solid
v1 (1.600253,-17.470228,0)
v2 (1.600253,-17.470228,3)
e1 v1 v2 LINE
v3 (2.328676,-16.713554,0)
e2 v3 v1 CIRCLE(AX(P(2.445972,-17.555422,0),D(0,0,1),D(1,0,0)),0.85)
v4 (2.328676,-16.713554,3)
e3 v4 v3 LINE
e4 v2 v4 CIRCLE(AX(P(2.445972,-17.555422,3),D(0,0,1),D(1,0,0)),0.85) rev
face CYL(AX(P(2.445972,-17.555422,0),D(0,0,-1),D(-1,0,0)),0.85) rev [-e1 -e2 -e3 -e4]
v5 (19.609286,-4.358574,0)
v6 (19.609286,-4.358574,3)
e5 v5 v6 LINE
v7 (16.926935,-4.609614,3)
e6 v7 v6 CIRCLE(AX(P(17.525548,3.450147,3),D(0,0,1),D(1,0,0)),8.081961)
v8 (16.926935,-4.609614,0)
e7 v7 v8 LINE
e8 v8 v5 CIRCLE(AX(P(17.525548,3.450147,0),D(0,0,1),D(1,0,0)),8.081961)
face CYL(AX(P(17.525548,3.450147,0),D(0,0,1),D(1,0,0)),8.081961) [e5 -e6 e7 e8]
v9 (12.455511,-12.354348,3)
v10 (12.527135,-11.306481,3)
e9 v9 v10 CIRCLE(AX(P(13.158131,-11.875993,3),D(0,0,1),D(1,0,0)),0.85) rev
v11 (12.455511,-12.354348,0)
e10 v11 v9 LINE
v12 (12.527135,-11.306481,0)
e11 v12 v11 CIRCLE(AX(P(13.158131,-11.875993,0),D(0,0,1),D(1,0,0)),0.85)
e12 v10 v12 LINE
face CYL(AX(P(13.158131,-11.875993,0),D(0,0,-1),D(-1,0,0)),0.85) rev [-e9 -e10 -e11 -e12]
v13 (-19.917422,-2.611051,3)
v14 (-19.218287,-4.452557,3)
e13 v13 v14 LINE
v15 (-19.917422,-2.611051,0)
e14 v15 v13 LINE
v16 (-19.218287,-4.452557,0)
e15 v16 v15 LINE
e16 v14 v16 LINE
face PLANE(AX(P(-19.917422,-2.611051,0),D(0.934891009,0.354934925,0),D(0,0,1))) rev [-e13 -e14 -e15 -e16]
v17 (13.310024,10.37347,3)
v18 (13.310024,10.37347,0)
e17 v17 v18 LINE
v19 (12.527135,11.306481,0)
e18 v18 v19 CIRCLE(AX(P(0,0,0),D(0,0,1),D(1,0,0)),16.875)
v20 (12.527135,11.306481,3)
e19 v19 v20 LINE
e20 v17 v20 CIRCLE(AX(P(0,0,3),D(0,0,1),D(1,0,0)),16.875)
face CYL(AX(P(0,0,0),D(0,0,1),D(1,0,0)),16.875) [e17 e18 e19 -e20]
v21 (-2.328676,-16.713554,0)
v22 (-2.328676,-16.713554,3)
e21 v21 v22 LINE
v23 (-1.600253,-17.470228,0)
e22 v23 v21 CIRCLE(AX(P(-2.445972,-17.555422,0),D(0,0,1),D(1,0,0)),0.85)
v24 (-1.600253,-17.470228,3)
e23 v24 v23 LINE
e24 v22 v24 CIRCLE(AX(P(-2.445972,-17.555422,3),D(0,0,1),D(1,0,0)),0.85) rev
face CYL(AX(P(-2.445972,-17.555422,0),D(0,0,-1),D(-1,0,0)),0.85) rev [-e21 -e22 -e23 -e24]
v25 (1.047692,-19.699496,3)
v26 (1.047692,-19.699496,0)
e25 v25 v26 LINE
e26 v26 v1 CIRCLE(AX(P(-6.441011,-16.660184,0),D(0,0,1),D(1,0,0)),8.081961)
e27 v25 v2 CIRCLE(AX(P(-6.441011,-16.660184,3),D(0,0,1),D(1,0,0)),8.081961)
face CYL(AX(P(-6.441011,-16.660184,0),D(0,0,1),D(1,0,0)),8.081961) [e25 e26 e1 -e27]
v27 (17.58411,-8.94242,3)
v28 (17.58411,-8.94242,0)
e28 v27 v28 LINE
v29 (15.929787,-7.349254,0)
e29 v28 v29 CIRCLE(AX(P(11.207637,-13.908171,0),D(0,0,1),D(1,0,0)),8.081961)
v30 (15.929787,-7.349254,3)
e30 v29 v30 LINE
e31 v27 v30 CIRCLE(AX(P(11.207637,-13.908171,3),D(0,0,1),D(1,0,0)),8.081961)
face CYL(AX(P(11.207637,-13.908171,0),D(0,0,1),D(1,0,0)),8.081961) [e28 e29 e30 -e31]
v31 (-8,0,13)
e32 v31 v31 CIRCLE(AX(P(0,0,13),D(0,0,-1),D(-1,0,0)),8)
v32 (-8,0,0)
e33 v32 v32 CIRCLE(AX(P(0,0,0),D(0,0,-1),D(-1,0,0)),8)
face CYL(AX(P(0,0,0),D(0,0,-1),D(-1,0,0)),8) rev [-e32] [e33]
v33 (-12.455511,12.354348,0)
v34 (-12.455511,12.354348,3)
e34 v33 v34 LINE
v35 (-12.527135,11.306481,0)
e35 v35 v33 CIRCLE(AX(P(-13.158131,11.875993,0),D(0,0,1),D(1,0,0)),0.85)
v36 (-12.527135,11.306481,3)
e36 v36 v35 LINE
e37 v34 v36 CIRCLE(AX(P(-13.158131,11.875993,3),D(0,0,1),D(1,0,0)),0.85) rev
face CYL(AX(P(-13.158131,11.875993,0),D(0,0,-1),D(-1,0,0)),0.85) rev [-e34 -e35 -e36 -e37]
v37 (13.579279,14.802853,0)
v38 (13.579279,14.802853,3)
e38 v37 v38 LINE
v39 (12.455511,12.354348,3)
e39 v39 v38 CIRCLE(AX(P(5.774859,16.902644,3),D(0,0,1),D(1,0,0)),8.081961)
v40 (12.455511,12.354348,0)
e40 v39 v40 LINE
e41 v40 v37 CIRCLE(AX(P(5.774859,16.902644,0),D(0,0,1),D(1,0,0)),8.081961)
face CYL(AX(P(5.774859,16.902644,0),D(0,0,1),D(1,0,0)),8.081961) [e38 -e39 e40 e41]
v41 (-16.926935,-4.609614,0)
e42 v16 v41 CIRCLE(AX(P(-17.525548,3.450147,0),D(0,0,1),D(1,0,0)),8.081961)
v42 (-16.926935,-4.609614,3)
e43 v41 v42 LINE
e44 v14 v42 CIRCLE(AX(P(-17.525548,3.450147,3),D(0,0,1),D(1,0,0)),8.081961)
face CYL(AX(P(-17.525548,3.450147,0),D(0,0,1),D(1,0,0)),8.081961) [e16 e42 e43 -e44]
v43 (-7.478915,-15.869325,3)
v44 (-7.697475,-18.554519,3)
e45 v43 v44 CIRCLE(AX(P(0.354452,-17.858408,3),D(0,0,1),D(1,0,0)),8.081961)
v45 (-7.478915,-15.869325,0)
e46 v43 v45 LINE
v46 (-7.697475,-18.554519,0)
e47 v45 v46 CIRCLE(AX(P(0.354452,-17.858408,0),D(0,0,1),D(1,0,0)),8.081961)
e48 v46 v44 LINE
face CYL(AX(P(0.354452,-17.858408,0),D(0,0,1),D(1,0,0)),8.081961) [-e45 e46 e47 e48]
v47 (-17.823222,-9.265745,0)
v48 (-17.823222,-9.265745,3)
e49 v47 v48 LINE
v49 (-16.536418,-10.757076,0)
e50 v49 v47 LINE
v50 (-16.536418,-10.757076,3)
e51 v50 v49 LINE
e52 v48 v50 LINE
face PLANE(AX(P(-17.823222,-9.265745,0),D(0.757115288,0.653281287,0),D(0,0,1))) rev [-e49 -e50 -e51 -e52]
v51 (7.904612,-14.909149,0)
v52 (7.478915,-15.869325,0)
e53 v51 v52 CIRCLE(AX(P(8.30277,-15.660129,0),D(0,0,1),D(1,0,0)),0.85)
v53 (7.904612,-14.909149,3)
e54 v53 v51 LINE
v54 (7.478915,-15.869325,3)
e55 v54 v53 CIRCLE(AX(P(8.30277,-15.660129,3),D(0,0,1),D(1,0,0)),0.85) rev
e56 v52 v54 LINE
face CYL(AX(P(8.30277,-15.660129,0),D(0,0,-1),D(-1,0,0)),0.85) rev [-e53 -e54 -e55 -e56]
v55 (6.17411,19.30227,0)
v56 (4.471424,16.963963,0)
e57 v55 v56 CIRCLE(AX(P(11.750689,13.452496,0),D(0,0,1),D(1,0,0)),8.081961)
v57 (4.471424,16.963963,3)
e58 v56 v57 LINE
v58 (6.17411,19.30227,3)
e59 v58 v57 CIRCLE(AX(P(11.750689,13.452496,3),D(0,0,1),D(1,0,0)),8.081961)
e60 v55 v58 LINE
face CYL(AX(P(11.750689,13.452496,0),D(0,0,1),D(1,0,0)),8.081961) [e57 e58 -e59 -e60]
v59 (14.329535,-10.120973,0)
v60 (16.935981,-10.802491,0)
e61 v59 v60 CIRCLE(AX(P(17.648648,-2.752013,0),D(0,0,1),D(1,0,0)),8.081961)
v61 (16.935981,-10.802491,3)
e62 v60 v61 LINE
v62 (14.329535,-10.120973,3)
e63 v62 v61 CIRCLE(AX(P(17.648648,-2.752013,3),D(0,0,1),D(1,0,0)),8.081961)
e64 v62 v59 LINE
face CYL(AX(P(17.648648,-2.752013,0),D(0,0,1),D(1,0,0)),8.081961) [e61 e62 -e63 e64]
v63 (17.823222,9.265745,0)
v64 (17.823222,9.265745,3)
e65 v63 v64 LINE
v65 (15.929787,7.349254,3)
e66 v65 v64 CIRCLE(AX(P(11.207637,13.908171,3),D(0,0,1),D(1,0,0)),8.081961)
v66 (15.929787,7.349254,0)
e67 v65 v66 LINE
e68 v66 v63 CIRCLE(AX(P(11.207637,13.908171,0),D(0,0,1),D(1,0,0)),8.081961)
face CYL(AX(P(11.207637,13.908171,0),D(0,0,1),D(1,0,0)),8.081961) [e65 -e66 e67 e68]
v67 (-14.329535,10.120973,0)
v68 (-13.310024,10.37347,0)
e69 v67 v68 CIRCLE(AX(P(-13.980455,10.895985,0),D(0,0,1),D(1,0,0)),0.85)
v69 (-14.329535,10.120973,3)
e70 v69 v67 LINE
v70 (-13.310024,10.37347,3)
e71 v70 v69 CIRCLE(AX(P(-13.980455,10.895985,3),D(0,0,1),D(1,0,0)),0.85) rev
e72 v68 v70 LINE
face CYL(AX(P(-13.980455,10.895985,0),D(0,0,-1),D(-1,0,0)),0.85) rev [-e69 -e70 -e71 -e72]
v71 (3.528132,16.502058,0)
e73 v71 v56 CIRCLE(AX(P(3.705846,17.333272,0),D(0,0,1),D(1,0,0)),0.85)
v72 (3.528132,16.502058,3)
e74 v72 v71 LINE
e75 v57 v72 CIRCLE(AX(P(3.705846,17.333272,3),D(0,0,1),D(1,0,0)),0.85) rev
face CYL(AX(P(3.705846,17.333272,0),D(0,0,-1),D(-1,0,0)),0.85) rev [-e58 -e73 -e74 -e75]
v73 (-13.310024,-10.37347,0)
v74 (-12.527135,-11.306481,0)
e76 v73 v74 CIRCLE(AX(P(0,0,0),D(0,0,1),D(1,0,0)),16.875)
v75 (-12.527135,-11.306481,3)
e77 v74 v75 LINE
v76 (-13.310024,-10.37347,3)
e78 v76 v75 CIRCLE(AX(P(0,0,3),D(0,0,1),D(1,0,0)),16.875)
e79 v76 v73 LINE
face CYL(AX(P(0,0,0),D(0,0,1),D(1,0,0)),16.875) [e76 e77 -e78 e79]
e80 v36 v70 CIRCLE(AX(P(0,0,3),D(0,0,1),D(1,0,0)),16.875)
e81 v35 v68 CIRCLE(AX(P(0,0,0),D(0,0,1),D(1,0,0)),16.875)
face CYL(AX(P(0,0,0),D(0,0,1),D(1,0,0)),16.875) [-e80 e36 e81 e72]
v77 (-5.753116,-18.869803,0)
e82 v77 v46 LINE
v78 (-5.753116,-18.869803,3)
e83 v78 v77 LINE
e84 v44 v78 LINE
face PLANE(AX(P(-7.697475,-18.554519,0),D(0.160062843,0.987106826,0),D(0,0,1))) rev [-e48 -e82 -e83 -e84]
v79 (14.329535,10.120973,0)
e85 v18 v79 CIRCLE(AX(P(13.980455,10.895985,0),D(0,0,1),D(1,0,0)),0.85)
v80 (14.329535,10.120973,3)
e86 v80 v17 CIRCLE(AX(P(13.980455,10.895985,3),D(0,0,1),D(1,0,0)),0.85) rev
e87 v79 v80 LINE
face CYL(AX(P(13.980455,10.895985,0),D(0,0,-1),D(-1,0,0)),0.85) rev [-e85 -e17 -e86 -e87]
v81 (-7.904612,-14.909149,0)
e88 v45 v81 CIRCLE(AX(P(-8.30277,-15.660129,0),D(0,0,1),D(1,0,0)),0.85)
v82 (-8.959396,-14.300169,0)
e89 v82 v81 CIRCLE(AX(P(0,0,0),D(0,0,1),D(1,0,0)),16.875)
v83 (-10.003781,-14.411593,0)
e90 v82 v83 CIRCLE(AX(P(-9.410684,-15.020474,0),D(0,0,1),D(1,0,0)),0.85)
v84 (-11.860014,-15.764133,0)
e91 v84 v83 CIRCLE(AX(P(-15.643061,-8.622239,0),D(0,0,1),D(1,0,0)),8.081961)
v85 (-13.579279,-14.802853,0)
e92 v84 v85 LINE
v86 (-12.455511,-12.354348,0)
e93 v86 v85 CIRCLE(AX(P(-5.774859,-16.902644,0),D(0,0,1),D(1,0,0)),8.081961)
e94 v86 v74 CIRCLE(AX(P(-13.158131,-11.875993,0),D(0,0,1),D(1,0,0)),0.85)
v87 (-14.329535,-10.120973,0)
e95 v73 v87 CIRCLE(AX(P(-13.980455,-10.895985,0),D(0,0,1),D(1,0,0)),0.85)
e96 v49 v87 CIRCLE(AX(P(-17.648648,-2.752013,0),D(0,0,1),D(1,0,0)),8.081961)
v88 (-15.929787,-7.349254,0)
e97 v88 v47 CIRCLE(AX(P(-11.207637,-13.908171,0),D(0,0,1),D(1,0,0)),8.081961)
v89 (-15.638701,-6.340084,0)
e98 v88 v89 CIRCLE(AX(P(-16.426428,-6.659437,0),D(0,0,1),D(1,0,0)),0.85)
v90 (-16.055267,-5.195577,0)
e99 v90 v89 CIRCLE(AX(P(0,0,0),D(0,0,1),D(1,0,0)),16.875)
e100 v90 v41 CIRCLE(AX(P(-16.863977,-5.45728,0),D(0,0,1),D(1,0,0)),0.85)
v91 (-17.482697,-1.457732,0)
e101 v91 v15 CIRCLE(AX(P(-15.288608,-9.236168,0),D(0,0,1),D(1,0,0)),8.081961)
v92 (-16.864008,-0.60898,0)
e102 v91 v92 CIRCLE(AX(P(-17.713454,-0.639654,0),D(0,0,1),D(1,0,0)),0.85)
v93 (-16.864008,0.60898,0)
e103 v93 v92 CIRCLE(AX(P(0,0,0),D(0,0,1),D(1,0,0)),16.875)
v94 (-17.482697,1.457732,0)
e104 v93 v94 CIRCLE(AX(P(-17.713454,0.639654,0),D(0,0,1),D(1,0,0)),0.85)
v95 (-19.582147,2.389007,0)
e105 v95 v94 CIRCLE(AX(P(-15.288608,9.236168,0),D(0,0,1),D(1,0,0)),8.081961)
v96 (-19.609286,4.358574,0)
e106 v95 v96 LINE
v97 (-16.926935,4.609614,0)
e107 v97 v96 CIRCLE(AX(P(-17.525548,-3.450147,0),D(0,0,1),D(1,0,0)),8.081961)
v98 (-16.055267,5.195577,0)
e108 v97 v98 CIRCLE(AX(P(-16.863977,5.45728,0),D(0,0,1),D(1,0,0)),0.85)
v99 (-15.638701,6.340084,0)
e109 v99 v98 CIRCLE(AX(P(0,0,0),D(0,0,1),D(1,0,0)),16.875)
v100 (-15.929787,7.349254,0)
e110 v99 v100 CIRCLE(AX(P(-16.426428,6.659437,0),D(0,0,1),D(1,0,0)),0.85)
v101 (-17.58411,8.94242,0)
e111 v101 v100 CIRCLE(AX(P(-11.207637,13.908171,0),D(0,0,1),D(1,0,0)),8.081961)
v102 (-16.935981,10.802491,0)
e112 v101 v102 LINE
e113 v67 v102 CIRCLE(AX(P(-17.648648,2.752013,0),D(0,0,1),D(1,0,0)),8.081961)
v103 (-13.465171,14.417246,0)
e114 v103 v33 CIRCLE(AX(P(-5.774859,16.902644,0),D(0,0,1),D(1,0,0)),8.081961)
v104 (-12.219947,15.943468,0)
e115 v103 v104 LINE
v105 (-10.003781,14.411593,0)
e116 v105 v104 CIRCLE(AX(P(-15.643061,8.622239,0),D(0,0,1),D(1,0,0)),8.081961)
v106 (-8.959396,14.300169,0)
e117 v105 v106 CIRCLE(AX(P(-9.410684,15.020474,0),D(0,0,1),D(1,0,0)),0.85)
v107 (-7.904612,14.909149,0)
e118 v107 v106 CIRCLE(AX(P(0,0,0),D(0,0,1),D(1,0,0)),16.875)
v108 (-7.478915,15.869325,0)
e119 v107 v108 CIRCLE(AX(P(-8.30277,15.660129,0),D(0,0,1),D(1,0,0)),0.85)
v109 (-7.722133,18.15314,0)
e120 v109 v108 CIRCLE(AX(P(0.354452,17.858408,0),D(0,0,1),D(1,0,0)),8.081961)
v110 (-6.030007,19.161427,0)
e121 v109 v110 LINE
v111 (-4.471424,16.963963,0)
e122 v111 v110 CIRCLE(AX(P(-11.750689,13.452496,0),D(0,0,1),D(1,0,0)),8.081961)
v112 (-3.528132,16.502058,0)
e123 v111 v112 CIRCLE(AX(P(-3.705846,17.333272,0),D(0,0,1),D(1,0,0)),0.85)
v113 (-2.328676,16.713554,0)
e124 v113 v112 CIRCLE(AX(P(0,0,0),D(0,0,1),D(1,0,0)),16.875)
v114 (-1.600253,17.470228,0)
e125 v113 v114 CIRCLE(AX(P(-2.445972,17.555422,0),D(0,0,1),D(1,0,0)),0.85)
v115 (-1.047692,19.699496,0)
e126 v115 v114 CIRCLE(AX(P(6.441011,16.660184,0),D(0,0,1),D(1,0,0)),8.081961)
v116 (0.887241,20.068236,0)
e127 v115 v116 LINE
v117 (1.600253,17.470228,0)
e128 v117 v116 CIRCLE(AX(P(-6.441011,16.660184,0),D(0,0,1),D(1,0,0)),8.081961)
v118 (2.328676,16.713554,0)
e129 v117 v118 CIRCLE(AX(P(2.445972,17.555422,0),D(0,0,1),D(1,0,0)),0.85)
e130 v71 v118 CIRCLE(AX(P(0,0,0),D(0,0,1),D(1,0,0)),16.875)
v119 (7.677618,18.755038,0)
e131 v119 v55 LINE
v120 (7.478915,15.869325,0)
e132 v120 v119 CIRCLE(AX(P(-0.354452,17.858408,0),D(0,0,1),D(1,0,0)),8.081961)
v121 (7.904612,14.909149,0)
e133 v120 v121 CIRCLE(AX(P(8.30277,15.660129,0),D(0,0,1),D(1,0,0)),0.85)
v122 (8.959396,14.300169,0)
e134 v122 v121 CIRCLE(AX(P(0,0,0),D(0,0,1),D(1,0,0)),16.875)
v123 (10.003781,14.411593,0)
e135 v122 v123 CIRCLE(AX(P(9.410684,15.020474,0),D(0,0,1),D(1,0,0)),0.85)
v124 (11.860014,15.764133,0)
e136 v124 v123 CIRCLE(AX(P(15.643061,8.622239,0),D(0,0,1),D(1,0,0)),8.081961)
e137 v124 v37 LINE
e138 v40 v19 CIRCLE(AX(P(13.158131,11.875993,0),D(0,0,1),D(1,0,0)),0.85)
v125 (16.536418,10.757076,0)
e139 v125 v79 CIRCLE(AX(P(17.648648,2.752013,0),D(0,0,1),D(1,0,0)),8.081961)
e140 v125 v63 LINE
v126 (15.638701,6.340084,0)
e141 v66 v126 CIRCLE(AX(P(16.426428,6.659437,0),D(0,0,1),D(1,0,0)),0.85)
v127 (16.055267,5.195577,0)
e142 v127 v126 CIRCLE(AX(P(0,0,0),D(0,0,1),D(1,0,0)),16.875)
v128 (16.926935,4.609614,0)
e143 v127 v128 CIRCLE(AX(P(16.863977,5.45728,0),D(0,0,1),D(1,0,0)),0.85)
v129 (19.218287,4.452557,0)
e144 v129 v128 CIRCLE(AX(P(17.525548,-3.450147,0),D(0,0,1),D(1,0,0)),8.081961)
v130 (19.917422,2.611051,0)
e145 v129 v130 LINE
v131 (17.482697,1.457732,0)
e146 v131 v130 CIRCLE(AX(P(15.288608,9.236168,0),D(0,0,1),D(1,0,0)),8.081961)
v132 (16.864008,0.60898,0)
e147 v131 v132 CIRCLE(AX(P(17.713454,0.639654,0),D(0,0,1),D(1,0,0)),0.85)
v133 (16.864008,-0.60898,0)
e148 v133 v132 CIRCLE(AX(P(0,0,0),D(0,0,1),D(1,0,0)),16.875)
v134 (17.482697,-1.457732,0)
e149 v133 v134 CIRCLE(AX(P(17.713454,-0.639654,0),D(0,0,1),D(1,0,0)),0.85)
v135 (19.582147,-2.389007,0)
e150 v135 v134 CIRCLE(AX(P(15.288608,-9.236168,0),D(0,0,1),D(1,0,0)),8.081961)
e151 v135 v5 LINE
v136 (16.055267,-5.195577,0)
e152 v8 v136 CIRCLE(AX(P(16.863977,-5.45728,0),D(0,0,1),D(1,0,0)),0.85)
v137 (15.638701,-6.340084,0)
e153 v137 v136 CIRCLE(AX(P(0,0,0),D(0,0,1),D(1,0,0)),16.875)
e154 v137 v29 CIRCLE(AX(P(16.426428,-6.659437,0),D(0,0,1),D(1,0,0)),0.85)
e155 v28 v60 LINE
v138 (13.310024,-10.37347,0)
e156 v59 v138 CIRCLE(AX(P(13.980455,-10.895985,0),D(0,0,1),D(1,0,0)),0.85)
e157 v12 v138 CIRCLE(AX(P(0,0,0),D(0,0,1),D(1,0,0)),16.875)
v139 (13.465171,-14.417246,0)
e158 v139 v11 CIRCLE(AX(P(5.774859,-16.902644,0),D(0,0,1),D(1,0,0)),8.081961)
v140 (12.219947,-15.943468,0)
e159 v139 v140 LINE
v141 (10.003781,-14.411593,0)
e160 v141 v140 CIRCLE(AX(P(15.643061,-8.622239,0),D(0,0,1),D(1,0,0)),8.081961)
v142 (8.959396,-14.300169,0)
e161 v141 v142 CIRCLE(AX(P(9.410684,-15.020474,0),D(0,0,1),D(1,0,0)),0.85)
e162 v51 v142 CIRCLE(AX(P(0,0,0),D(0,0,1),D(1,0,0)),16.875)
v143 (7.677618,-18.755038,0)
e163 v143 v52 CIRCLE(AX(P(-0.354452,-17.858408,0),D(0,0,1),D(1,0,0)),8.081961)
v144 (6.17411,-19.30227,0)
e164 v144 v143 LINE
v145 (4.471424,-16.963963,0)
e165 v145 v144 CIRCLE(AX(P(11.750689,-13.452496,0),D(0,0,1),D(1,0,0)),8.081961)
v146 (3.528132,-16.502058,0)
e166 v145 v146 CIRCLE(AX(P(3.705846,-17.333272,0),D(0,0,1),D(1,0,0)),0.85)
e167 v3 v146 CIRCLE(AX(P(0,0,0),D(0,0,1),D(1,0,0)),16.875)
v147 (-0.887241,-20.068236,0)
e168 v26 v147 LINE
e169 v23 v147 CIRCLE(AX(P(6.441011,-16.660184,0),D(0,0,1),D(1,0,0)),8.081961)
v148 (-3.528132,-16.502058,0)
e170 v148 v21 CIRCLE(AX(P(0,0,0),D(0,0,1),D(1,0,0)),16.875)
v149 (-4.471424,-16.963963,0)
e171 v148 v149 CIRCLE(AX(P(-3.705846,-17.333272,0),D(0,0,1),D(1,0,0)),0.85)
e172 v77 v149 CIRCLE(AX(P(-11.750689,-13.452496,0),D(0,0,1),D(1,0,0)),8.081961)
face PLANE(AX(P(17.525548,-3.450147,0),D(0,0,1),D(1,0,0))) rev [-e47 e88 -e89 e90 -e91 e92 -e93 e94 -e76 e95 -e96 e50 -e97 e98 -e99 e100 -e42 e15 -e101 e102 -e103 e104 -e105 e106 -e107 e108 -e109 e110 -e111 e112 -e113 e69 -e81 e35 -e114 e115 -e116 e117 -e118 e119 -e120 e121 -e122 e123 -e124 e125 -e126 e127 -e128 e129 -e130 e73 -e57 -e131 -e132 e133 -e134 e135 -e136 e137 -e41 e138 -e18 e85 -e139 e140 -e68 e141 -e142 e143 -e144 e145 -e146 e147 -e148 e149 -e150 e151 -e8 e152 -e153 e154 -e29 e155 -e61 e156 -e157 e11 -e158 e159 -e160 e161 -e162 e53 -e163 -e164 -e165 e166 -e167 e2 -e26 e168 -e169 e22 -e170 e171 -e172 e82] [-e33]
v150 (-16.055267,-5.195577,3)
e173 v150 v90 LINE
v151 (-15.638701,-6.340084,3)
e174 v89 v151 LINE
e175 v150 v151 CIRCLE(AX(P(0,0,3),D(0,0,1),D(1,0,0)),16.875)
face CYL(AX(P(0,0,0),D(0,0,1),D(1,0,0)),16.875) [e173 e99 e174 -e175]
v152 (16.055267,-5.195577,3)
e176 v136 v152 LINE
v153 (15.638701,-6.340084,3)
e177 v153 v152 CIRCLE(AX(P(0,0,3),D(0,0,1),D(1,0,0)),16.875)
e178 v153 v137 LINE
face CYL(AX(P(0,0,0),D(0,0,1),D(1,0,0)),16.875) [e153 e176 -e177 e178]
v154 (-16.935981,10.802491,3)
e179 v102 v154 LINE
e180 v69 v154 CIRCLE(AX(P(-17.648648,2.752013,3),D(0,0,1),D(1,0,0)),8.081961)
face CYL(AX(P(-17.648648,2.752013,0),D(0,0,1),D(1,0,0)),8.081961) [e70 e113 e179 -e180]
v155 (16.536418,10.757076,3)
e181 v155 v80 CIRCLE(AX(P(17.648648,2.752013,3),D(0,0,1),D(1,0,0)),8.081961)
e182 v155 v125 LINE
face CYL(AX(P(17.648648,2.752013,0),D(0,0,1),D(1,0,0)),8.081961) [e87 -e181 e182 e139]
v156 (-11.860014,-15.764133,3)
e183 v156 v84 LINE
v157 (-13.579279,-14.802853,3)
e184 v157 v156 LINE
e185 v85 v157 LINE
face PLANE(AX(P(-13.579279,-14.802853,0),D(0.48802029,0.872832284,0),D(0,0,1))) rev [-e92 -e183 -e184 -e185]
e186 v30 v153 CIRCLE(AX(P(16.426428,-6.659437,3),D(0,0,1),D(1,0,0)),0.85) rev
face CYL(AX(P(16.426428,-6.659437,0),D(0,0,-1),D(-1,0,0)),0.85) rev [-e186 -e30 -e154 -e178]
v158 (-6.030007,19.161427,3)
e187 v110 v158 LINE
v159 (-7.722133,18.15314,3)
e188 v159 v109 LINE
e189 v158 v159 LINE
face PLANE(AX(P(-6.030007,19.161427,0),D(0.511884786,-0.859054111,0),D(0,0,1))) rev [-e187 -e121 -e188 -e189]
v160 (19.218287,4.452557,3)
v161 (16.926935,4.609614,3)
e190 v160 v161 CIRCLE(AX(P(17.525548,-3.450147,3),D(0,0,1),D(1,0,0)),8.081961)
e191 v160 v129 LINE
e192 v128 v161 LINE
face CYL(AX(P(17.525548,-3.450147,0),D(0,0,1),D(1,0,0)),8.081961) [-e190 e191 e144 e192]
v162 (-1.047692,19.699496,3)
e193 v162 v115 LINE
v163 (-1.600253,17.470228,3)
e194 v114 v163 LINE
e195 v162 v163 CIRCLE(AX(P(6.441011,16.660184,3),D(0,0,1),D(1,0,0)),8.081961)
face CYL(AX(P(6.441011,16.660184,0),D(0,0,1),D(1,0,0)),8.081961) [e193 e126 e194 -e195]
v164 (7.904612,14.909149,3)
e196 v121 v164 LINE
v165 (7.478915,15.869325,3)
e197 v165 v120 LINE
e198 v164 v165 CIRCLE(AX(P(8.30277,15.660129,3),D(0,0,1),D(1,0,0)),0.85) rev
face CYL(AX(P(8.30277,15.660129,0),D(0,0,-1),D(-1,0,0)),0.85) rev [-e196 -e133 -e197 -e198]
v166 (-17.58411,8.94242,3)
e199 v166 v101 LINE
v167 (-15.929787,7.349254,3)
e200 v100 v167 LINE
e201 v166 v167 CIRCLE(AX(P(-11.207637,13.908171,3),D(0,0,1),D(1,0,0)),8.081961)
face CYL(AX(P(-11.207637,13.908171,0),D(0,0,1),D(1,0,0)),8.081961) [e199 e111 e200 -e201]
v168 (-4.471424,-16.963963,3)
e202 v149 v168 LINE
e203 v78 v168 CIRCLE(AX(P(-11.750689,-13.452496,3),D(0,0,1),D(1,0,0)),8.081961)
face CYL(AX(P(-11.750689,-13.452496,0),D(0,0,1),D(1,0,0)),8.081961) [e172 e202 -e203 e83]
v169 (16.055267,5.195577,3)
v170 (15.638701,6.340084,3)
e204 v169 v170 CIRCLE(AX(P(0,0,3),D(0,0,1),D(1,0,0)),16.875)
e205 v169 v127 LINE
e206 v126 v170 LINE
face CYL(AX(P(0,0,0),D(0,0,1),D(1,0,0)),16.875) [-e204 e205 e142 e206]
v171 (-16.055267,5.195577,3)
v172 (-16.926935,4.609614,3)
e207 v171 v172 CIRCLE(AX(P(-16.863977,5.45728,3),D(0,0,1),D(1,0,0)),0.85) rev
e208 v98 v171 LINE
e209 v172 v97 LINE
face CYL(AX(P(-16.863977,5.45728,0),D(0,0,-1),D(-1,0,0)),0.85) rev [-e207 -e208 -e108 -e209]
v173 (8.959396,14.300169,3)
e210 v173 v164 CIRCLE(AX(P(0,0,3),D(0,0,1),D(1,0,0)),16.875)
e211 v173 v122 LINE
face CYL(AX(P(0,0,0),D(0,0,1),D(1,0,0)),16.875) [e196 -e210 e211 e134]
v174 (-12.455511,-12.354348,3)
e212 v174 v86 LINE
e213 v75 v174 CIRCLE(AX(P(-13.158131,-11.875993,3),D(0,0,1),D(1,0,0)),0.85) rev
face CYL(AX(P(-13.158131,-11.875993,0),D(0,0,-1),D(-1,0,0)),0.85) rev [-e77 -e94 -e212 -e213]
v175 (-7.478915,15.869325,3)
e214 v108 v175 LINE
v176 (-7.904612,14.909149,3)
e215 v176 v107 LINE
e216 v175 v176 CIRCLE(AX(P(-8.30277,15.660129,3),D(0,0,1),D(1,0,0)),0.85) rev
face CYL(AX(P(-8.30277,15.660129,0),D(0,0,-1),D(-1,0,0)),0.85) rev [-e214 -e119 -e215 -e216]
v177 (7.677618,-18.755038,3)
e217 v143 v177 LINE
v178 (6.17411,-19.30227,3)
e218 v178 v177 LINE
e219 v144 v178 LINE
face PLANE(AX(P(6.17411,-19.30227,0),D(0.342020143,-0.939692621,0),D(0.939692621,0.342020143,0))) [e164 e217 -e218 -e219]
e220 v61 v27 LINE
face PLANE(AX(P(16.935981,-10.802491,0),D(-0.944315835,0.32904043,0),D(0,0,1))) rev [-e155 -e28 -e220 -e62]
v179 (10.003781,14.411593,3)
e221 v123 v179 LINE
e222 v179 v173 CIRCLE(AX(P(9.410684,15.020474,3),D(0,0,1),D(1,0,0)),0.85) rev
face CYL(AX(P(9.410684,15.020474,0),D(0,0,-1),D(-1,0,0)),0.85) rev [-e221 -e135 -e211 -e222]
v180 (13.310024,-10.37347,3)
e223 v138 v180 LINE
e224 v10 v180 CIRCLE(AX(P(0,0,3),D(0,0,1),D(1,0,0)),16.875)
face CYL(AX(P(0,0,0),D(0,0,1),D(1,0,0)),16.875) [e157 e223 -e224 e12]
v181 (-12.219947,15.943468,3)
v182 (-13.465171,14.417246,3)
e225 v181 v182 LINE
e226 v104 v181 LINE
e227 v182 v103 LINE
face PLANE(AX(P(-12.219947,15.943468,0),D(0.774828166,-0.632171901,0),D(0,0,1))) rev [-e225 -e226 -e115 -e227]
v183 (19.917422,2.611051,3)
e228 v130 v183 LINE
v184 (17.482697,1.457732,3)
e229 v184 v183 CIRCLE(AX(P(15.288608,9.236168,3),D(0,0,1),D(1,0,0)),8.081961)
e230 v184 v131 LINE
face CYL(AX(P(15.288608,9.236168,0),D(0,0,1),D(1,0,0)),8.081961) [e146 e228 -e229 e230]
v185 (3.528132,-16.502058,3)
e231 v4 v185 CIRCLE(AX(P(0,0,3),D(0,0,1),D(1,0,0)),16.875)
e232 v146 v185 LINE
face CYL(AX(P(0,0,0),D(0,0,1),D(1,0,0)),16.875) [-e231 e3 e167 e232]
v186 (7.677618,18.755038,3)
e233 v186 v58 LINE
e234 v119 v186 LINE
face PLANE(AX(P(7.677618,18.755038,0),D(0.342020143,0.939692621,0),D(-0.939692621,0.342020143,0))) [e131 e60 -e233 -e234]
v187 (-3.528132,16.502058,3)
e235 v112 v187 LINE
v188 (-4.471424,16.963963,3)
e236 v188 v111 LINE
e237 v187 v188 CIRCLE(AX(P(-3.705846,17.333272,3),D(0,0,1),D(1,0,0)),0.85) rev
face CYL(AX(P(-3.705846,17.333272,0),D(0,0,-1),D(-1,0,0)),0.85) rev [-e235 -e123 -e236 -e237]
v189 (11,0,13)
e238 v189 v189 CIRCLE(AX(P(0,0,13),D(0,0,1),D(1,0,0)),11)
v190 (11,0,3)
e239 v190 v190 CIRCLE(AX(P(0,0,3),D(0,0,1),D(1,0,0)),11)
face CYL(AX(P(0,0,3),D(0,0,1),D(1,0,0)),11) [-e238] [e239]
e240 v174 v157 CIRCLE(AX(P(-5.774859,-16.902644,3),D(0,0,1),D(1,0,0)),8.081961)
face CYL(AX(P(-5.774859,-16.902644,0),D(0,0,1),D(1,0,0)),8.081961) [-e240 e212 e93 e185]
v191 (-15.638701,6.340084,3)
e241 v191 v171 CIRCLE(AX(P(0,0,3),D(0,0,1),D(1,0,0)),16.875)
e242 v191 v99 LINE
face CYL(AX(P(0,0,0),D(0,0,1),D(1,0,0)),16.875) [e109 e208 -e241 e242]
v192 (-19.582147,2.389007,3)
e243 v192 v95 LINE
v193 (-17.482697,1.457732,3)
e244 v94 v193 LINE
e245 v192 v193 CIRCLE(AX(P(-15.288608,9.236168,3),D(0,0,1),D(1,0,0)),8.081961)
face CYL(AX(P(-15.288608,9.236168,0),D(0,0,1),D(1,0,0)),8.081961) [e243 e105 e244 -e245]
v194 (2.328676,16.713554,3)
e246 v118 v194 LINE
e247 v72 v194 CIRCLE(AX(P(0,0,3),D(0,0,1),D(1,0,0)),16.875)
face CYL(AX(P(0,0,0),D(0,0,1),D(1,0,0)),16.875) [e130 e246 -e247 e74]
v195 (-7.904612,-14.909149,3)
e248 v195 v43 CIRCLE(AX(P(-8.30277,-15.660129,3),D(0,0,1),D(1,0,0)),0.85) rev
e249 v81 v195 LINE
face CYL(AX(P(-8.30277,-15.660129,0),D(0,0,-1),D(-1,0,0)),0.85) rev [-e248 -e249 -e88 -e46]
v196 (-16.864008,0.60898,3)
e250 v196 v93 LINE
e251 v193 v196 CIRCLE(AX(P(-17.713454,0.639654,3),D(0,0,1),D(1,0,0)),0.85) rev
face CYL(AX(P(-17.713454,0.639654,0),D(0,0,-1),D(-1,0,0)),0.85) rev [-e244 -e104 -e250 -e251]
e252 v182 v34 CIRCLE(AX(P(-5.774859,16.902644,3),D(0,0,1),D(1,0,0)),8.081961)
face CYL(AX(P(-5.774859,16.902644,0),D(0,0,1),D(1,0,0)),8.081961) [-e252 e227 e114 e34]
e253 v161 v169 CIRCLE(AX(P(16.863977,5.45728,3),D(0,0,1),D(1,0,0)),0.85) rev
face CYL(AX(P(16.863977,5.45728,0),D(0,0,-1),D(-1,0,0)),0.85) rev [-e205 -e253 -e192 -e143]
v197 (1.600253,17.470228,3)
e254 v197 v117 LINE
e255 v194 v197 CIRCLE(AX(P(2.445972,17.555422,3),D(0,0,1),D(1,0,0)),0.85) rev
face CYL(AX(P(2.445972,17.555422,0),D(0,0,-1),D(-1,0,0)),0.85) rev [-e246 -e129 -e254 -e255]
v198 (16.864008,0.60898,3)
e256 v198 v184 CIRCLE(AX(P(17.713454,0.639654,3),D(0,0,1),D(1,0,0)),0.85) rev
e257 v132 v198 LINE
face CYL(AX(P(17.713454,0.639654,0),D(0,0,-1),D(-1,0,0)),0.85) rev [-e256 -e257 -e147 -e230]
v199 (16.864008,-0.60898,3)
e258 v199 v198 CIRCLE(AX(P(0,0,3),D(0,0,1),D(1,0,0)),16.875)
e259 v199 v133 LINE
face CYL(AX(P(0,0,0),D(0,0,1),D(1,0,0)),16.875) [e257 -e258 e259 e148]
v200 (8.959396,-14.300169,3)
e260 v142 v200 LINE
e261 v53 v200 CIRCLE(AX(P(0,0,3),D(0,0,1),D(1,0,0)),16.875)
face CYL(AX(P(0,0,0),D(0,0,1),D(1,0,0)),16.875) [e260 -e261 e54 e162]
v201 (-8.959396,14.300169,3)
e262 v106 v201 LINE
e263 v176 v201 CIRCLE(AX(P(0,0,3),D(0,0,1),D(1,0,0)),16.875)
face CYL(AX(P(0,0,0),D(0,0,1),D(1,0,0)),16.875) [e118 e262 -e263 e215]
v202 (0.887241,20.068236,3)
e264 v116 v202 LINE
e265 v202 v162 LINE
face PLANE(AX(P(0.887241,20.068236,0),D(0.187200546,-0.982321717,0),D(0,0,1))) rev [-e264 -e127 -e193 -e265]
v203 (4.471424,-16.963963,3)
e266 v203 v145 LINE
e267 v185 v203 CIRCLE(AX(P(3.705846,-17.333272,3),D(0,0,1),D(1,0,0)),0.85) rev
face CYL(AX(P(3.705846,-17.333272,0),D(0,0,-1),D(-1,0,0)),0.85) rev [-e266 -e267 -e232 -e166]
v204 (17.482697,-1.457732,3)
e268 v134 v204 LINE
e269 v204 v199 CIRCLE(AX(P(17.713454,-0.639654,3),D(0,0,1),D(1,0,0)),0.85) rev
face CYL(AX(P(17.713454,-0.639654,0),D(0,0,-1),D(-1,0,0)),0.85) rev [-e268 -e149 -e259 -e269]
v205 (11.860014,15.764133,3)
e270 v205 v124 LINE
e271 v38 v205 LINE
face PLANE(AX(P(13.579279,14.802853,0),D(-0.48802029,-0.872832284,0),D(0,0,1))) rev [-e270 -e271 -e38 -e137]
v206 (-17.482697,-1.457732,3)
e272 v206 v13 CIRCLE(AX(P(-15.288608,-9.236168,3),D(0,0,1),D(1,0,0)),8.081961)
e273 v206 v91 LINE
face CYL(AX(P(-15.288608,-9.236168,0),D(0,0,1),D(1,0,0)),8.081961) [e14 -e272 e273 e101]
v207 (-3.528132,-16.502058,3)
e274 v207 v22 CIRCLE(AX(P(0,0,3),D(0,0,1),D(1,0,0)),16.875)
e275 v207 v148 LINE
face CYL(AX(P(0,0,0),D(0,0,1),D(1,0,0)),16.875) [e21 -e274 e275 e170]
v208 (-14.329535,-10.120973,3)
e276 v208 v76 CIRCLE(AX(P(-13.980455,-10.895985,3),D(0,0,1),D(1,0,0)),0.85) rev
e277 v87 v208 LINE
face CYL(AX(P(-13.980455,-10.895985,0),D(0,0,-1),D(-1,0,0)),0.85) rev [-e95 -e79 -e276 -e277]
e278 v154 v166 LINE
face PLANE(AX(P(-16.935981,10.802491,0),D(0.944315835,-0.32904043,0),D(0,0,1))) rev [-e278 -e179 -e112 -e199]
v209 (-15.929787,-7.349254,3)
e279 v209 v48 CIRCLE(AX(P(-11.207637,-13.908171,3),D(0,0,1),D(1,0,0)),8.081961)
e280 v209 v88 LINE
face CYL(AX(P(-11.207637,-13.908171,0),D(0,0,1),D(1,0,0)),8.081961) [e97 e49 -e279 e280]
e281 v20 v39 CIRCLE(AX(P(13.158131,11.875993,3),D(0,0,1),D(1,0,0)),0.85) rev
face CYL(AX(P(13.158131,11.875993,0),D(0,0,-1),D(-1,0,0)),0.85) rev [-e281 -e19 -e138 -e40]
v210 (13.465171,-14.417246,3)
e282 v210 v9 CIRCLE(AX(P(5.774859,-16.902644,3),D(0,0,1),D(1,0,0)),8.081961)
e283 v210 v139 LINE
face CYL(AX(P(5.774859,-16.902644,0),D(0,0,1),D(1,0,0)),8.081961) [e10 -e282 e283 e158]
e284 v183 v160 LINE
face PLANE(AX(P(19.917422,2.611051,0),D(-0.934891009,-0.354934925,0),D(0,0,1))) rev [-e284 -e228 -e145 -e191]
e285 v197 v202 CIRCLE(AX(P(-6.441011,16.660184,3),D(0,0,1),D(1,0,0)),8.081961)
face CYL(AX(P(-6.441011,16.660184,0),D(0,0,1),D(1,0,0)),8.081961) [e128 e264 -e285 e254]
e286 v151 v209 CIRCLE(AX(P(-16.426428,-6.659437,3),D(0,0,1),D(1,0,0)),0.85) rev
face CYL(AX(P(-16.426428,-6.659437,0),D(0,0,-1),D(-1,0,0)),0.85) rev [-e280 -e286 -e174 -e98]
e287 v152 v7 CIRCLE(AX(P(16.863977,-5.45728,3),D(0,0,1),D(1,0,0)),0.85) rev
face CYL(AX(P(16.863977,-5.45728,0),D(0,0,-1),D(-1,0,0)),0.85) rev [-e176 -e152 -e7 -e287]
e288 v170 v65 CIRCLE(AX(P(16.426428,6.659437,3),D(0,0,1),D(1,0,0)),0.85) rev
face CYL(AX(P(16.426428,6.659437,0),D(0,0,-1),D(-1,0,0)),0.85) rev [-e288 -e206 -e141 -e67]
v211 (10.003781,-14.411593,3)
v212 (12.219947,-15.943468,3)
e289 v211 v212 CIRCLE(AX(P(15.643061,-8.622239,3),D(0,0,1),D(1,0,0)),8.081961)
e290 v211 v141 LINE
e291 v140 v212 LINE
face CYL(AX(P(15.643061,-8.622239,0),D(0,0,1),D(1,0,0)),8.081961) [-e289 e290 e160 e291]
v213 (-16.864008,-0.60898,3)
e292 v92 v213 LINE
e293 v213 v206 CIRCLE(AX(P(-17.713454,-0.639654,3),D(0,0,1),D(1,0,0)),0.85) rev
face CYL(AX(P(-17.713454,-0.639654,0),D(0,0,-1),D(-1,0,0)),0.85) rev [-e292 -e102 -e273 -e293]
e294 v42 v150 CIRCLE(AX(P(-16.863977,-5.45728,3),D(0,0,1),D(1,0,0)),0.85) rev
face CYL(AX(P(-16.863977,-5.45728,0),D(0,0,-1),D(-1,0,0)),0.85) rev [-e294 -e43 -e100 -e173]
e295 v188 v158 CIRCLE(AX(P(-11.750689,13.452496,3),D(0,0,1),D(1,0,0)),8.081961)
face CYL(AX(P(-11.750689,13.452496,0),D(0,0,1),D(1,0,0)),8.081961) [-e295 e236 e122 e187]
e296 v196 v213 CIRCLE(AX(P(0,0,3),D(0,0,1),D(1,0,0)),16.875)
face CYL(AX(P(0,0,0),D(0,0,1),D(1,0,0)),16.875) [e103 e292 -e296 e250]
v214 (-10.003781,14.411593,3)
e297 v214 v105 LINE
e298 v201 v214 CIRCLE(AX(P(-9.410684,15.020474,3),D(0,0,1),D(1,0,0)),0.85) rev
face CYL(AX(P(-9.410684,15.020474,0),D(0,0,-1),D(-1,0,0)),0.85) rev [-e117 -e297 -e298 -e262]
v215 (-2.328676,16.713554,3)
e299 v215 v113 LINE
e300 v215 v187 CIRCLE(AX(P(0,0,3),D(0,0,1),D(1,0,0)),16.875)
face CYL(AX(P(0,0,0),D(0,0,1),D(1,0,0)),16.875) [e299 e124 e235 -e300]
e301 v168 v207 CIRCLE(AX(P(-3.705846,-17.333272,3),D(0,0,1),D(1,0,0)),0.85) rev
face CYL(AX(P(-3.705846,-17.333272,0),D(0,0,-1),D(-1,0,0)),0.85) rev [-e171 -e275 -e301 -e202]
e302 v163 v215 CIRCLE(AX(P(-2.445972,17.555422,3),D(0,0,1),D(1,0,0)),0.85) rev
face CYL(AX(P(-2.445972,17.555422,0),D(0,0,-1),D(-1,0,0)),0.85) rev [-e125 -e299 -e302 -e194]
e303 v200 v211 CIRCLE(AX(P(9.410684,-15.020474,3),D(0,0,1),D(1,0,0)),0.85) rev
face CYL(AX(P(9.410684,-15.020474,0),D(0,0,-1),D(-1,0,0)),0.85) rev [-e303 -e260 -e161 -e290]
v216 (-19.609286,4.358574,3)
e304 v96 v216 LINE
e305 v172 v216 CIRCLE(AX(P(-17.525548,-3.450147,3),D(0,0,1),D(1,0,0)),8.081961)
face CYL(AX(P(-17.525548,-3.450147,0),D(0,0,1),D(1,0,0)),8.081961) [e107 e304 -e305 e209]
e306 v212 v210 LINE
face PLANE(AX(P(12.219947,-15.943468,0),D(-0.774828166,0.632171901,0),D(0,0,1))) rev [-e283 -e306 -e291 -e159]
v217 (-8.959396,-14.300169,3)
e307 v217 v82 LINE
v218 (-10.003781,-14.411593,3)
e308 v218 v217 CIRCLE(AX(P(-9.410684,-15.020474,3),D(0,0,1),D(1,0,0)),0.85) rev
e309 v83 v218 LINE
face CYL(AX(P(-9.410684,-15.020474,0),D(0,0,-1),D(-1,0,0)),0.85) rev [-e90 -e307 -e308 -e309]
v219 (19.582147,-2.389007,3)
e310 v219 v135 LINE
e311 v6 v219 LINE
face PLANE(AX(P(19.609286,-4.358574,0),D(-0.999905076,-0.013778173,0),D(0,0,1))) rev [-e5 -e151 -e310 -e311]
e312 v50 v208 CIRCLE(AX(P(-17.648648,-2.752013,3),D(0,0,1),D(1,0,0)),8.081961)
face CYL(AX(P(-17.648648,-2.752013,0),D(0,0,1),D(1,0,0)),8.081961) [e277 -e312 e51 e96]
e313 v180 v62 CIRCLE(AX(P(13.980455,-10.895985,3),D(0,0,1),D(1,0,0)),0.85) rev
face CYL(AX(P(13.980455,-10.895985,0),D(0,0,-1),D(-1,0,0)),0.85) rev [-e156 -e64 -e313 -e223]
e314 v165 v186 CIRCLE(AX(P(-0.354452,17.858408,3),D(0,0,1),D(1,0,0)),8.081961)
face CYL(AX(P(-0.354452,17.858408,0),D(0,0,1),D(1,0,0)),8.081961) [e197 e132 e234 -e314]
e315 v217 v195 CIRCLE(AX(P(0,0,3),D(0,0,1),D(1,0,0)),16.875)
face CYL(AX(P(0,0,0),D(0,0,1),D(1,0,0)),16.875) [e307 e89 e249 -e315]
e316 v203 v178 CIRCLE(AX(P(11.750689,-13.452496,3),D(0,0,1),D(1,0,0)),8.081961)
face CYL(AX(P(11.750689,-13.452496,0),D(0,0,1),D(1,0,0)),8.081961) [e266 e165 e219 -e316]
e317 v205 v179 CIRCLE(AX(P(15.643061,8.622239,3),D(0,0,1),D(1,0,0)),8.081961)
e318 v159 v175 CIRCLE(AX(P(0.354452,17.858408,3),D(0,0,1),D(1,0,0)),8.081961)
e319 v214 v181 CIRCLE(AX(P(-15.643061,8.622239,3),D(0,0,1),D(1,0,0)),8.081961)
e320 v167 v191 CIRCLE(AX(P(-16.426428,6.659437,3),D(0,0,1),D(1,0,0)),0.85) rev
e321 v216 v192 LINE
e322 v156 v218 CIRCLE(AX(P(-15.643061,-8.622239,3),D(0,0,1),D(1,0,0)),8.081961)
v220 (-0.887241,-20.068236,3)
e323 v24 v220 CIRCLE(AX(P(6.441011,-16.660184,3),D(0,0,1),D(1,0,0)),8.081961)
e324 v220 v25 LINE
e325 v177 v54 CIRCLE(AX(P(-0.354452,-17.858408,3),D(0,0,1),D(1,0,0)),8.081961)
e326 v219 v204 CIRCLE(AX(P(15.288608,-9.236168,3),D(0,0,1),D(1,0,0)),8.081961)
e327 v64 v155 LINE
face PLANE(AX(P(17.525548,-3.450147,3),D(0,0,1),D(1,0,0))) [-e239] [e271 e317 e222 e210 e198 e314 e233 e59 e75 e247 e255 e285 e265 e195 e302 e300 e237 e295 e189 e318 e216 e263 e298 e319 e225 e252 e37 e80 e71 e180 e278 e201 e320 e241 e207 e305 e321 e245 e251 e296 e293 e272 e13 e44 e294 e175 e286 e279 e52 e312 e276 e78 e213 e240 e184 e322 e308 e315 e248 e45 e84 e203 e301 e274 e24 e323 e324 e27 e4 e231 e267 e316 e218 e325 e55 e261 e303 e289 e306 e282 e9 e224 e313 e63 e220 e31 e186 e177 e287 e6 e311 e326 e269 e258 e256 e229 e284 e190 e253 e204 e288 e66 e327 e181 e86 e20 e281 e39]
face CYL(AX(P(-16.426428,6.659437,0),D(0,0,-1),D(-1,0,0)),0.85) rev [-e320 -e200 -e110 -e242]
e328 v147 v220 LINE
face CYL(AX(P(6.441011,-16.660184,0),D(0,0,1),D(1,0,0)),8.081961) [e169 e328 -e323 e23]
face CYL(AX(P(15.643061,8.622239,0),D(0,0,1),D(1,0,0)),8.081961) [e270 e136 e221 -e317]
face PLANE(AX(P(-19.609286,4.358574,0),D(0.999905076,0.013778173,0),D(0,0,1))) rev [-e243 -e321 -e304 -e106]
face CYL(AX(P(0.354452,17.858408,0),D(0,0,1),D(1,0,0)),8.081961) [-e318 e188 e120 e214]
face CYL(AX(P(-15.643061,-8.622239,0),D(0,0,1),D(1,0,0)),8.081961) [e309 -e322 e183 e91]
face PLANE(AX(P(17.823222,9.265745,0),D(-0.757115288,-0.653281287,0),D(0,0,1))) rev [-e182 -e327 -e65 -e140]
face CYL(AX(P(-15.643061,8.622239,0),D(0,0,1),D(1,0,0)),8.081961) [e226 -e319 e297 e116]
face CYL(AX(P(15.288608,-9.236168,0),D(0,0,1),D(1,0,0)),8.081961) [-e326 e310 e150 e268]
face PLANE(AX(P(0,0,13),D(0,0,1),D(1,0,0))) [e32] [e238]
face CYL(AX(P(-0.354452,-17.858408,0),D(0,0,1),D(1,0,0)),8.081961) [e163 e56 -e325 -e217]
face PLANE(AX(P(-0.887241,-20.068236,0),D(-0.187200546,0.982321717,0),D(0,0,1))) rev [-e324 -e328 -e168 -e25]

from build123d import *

# Parameters (mm, degrees)
EXTRUDE_1_DEPTH         = 3
SKETCH_2_W              = 11
SKETCH_2_H              = 10
HOLE_WIZARD_16_0_16_1_D = 16
FILLET_1_R              = 0.85


with BuildPart() as part:
    # 草图1 → 凸台-拉伸1 (new body)
    with BuildSketch(Plane.XY.offset(3)):
        with BuildLine():
            Line((7.677617845, 18.755038144), (6.174109651, 19.302270373))
            ThreePointArc((6.174109651, 19.302270373), (5.023989627, 17.932407977), (4.203345275, 16.343118231))
            ThreePointArc((4.203345275, 16.343118231), (2.930312998, 16.618630832), (1.639823102, 16.795136355))
            ThreePointArc((1.639823102, 16.795136355), (1.197968963, 19.299137818), (0, 21.541932676))
            ThreePointArc((0, 21.541932676), (-1.197968963, 19.299137818), (-1.639823102, 16.795136355))
            ThreePointArc((-1.639823102, 16.795136355), (-2.930312998, 16.618630832), (-4.203345275, 16.343118231))
            ThreePointArc((-4.203345275, 16.343118231), (-5.474971289, 18.544986912), (-7.367774901, 20.242795173))
            ThreePointArc((-7.367774901, 20.242795173), (-7.726416477, 17.725527879), (-7.285204612, 15.221413166))
            ThreePointArc((-7.285204612, 15.221413166), (-8.4375, 14.614178689), (-9.539528177, 13.919878849))
            ThreePointArc((-9.539528177, 13.919878849), (-11.4875492, 15.554036889), (-13.846887413, 16.50207782))
            ThreePointArc((-13.846887413, 16.50207782), (-13.322944134, 14.013957677), (-12.051882927, 11.811762904))
            ThreePointArc((-12.051882927, 11.811762904), (-12.926999978, 10.847040913), (-13.725103193, 9.817696642))
            ThreePointArc((-13.725103193, 9.817696642), (-16.114559141, 10.687040464), (-18.655860944, 10.770966338))
            ThreePointArc((-18.655860944, 10.770966338), (-17.312528103, 8.612097355), (-15.364926295, 6.977439714))
            ThreePointArc((-15.364926295, 6.977439714), (-15.857312976, 5.771589919), (-16.255228202, 4.531355326))
            ThreePointArc((-16.255228202, 4.531355326), (-18.797915423, 4.531029235), (-21.214662314, 3.740717353))
            ThreePointArc((-21.214662314, 3.740717353), (-19.213965677, 2.17149099), (-16.824732789, 1.301534317))
            ThreePointArc((-16.824732789, 1.301534317), (-16.875, 0), (-16.824732789, -1.301534317))
            ThreePointArc((-16.824732789, -1.301534317), (-19.213965677, -2.17149099), (-21.214662314, -3.740717353))
            ThreePointArc((-21.214662314, -3.740717353), (-18.797915423, -4.531029235), (-16.255228202, -4.531355326))
            ThreePointArc((-16.255228202, -4.531355326), (-15.857312976, -5.771589919), (-15.364926295, -6.977439714))
            ThreePointArc((-15.364926295, -6.977439714), (-17.312528103, -8.612097355), (-18.655860944, -10.770966338))
            ThreePointArc((-18.655860944, -10.770966338), (-16.114559141, -10.687040464), (-13.725103193, -9.817696642))
            ThreePointArc((-13.725103193, -9.817696642), (-12.926999978, -10.847040913), (-12.051882927, -11.811762904))
            ThreePointArc((-12.051882927, -11.811762904), (-13.322944134, -14.013957677), (-13.846887413, -16.50207782))
            ThreePointArc((-13.846887413, -16.50207782), (-11.4875492, -15.554036889), (-9.539528177, -13.919878849))
            ThreePointArc((-9.539528177, -13.919878849), (-8.4375, -14.614178689), (-7.285204612, -15.221413166))
            ThreePointArc((-7.285204612, -15.221413166), (-7.726416477, -17.725527879), (-7.367774901, -20.242795173))
            ThreePointArc((-7.367774901, -20.242795173), (-5.474971289, -18.544986912), (-4.203345275, -16.343118231))
            ThreePointArc((-4.203345275, -16.343118231), (-2.930312998, -16.618630832), (-1.639823102, -16.795136355))
            ThreePointArc((-1.639823102, -16.795136355), (-1.197968963, -19.299137818), (0, -21.541932676))
            ThreePointArc((0, -21.541932676), (1.197968963, -19.299137818), (1.639823102, -16.795136355))
            ThreePointArc((1.639823102, -16.795136355), (2.930312998, -16.618630832), (4.203345275, -16.343118231))
            ThreePointArc((4.203345275, -16.343118231), (5.023989627, -17.932407977), (6.174109651, -19.302270373))
            Line((6.174109651, -19.302270373), (7.677617845, -18.755038144))
            ThreePointArc((7.677617845, -18.755038144), (7.678130324, -16.966379766), (7.285204612, -15.221413166))
            ThreePointArc((7.285204612, -15.221413166), (8.4375, -14.614178689), (9.539528177, -13.919878849))
            ThreePointArc((9.539528177, -13.919878849), (11.4875492, -15.554036889), (13.846887413, -16.50207782))
            ThreePointArc((13.846887413, -16.50207782), (13.322944134, -14.013957677), (12.051882927, -11.811762904))
            ThreePointArc((12.051882927, -11.811762904), (12.926999978, -10.847040913), (13.725103193, -9.817696642))
            ThreePointArc((13.725103193, -9.817696642), (16.114559141, -10.687040464), (18.655860944, -10.770966338))
            ThreePointArc((18.655860944, -10.770966338), (17.312528103, -8.612097355), (15.364926295, -6.977439714))
            ThreePointArc((15.364926295, -6.977439714), (15.857312976, -5.771589919), (16.255228202, -4.531355326))
            ThreePointArc((16.255228202, -4.531355326), (18.797915423, -4.531029235), (21.214662314, -3.740717353))
            ThreePointArc((21.214662314, -3.740717353), (19.213965677, -2.17149099), (16.824732789, -1.301534317))
            ThreePointArc((16.824732789, -1.301534317), (16.875, 0), (16.824732789, 1.301534317))
            ThreePointArc((16.824732789, 1.301534317), (19.213965677, 2.17149099), (21.214662314, 3.740717353))
            ThreePointArc((21.214662314, 3.740717353), (18.797915423, 4.531029235), (16.255228202, 4.531355326))
            ThreePointArc((16.255228202, 4.531355326), (15.857312976, 5.771589919), (15.364926295, 6.977439714))
            ThreePointArc((15.364926295, 6.977439714), (17.312528103, 8.612097355), (18.655860944, 10.770966338))
            ThreePointArc((18.655860944, 10.770966338), (16.114559141, 10.687040464), (13.725103193, 9.817696642))
            ThreePointArc((13.725103193, 9.817696642), (12.926999978, 10.847040913), (12.051882927, 11.811762904))
            ThreePointArc((12.051882927, 11.811762904), (13.322944134, 14.013957677), (13.846887413, 16.50207782))
            ThreePointArc((13.846887413, 16.50207782), (11.4875492, 15.554036889), (9.539528177, 13.919878849))
            ThreePointArc((9.539528177, 13.919878849), (8.4375, 14.614178689), (7.285204612, 15.221413166))
            ThreePointArc((7.285204612, 15.221413166), (7.678130324, 16.966379766), (7.677617845, 18.755038144))
        make_face()
    extrude(amount=-EXTRUDE_1_DEPTH)

    # 草图2 → 旋转1 (revolve)
    with BuildSketch(Plane(origin=(0, 0, 0), x_dir=(1, 0, 0), z_dir=(0, 1, 0))):
        with Locations((5.5, -8)):
            Rectangle(SKETCH_2_W, SKETCH_2_H)
    revolve(axis=Axis((0, 0, 3), (0, 0, 1)))

    # Ø16.0 (16) 直径孔1 (through all)
    with Locations(Plane(origin=(0, 0, 0), x_dir=(-1, 0, 0), z_dir=(0, 0, -1))):
        with Locations((0, 0)):
            Hole(HOLE_WIZARD_16_0_16_1_D / 2)

    # 倒角1
    # the kernel refuses this chamfer: 2.4092894, 1.801151222 mm, written as the material it takes off along each edge
    with BuildSketch(Plane(origin=(21.214662314, 3.740717353, 8.457999089), x_dir=(-0.9419139002762257, 0.33585443940259097, 0), z_dir=(0, 0, -1)), Plane(origin=(21.214662314, -3.740717353, 8.457999089), x_dir=(-0.7702405580042077, 0.6377534655377162, 0), z_dir=(0, 0, -1)), Plane(origin=(18.655860944, -10.770966338, 8.457999089), x_dir=(-0.5056648368969275, 0.8627300114902714, 0), z_dir=(0, 0, -1)), Plane(origin=(13.846887413, -16.50207782, 8.457999089), x_dir=(-0.18009847364168569, 0.9836485855181895, 0), z_dir=(0, 0, -1)), Plane(origin=(0, -21.541932676, 8.457999089), x_dir=(0.4943136881093548, 0.8692836002983879, 0), z_dir=(0, 0, -1)), Plane(origin=(-7.367774901, -20.242795173, 8.457999089), x_dir=(0.7618154266345339, 0.6477941461156027, 0), z_dir=(0, 0, -1)), Plane(origin=(-13.846887413, -16.50207782, 8.457999089), x_dir=(0.9374309815093264, 0.3481711574878957, 0), z_dir=(0, 0, -1)), Plane(origin=(18.655860944, 10.770966338, 8.457999089), x_dir=(-0.9999785250062793, -0.00655358880811246, 0), z_dir=(0, 0, -1))) as chamfer_1_piece_1:
        with BuildLine():
            Line((2.119488029, 0), (0.84248532, -1.499732591))
            ThreePointArc((0.84248532, -1.499732591), (0.389416714, -0.786885265), (0, 0))
            ThreePointArc((0, 0), (1.091111326, 0.069719636), (2.119488029, 0))
        make_face()
    extrude(amount=13.915998179, mode=Mode.SUBTRACT)
    with BuildSketch(Plane(origin=(-18.655860944, -10.770966338, 8.457999089), x_dir=(0.48404481309239716, 0.8750432097435796, 0), z_dir=(0, 0, -1)), Plane(origin=(-21.214662314, -3.740717353, 8.457999089), x_dir=(0.7541357430052743, 0.6567185707149471, 0), z_dir=(0, 0, -1)), Plane(origin=(-21.214662314, 3.740717353, 8.457999089), x_dir=(0.9332667724535083, 0.35918397992423245, 0), z_dir=(0, 0, -1)), Plane(origin=(-18.655860944, 10.770966338, 8.457999089), x_dir=(0.9998320555932133, 0.01832650016368515, 0), z_dir=(0, 0, -1)), Plane(origin=(-13.846887413, 16.50207782, 8.457999089), x_dir=(0.9458028368787899, -0.32474142598694317, 0), z_dir=(0, 0, -1)), Plane(origin=(-7.367774901, 20.242795173, 8.457999089), x_dir=(0.777695837473541, -0.6286407434905311, 0), z_dir=(0, 0, -1)), Plane(origin=(0, 21.541932676, 8.457999089), x_dir=(0.5157872425008245, -0.8567167095798913, 0), z_dir=(0, 0, -1)), Plane(origin=(13.846887413, 16.50207782, 8.457999089), x_dir=(-0.15557093497995983, -0.9878247234147671, 0), z_dir=(0, 0, -1))) as chamfer_1_piece_2:
        with BuildLine():
            Line((1.72016841, 0), (1.038059727, 1.847880275))
            ThreePointArc((1.038059727, 1.847880275), (0.473607386, 0.985434319), (0, 0))
            ThreePointArc((0, 0), (0.87677191, -0.045878267), (1.72016841, 0))
        make_face()
    extrude(amount=13.915998179, mode=Mode.SUBTRACT)

    # 圆角1
    fillet_1_edges = [part.edges().sort_by_distance(p)[0] for p in [
        (16.824732789, 1.301534317, 1.5),
        (16.824732789, -1.301534317, 1.5),
        (16.255228202, -4.531355326, 1.5),
        (15.364926295, -6.977439714, 1.5),
        (13.725103193, -9.817696642, 1.5),
        (12.051882927, -11.811762904, 1.5),
        (9.539528177, -13.919878849, 1.5),
        (7.285204612, -15.221413166, 1.5),
        (4.203345275, -16.343118231, 1.5),
        (1.639823102, -16.795136355, 1.5),
        (-1.639823102, -16.795136355, 1.5),
        (-4.203345275, -16.343118231, 1.5),
        (-7.285204612, -15.221413166, 1.5),
        (-9.539528177, -13.919878849, 1.5),
        (-12.051882927, -11.811762904, 1.5),
        (-13.725103193, -9.817696642, 1.5),
        (-15.364926295, -6.977439714, 1.5),
        (-16.255228202, -4.531355326, 1.5),
        (-16.824732789, -1.301534317, 1.5),
        (-16.824732789, 1.301534317, 1.5),
        (-16.255228202, 4.531355326, 1.5),
        (-15.364926295, 6.977439714, 1.5),
        (-13.725103193, 9.817696642, 1.5),
        (-12.051882927, 11.811762904, 1.5),
        (-9.539528177, 13.919878849, 1.5),
        (-7.285204612, 15.221413166, 1.5),
        (-4.203345275, 16.343118231, 1.5),
        (-1.639823102, 16.795136355, 1.5),
        (1.639823102, 16.795136355, 1.5),
        (4.203345275, 16.343118231, 1.5),
        (7.285204612, 15.221413166, 1.5),
        (9.539528177, 13.919878849, 1.5),
        (12.051882927, 11.811762904, 1.5),
        (13.725103193, 9.817696642, 1.5),
        (15.364926295, 6.977439714, 1.5),
        (16.255228202, 4.531355326, 1.5),
    ]]
    fillet(fillet_1_edges, radius=FILLET_1_R)


solid = part.part
